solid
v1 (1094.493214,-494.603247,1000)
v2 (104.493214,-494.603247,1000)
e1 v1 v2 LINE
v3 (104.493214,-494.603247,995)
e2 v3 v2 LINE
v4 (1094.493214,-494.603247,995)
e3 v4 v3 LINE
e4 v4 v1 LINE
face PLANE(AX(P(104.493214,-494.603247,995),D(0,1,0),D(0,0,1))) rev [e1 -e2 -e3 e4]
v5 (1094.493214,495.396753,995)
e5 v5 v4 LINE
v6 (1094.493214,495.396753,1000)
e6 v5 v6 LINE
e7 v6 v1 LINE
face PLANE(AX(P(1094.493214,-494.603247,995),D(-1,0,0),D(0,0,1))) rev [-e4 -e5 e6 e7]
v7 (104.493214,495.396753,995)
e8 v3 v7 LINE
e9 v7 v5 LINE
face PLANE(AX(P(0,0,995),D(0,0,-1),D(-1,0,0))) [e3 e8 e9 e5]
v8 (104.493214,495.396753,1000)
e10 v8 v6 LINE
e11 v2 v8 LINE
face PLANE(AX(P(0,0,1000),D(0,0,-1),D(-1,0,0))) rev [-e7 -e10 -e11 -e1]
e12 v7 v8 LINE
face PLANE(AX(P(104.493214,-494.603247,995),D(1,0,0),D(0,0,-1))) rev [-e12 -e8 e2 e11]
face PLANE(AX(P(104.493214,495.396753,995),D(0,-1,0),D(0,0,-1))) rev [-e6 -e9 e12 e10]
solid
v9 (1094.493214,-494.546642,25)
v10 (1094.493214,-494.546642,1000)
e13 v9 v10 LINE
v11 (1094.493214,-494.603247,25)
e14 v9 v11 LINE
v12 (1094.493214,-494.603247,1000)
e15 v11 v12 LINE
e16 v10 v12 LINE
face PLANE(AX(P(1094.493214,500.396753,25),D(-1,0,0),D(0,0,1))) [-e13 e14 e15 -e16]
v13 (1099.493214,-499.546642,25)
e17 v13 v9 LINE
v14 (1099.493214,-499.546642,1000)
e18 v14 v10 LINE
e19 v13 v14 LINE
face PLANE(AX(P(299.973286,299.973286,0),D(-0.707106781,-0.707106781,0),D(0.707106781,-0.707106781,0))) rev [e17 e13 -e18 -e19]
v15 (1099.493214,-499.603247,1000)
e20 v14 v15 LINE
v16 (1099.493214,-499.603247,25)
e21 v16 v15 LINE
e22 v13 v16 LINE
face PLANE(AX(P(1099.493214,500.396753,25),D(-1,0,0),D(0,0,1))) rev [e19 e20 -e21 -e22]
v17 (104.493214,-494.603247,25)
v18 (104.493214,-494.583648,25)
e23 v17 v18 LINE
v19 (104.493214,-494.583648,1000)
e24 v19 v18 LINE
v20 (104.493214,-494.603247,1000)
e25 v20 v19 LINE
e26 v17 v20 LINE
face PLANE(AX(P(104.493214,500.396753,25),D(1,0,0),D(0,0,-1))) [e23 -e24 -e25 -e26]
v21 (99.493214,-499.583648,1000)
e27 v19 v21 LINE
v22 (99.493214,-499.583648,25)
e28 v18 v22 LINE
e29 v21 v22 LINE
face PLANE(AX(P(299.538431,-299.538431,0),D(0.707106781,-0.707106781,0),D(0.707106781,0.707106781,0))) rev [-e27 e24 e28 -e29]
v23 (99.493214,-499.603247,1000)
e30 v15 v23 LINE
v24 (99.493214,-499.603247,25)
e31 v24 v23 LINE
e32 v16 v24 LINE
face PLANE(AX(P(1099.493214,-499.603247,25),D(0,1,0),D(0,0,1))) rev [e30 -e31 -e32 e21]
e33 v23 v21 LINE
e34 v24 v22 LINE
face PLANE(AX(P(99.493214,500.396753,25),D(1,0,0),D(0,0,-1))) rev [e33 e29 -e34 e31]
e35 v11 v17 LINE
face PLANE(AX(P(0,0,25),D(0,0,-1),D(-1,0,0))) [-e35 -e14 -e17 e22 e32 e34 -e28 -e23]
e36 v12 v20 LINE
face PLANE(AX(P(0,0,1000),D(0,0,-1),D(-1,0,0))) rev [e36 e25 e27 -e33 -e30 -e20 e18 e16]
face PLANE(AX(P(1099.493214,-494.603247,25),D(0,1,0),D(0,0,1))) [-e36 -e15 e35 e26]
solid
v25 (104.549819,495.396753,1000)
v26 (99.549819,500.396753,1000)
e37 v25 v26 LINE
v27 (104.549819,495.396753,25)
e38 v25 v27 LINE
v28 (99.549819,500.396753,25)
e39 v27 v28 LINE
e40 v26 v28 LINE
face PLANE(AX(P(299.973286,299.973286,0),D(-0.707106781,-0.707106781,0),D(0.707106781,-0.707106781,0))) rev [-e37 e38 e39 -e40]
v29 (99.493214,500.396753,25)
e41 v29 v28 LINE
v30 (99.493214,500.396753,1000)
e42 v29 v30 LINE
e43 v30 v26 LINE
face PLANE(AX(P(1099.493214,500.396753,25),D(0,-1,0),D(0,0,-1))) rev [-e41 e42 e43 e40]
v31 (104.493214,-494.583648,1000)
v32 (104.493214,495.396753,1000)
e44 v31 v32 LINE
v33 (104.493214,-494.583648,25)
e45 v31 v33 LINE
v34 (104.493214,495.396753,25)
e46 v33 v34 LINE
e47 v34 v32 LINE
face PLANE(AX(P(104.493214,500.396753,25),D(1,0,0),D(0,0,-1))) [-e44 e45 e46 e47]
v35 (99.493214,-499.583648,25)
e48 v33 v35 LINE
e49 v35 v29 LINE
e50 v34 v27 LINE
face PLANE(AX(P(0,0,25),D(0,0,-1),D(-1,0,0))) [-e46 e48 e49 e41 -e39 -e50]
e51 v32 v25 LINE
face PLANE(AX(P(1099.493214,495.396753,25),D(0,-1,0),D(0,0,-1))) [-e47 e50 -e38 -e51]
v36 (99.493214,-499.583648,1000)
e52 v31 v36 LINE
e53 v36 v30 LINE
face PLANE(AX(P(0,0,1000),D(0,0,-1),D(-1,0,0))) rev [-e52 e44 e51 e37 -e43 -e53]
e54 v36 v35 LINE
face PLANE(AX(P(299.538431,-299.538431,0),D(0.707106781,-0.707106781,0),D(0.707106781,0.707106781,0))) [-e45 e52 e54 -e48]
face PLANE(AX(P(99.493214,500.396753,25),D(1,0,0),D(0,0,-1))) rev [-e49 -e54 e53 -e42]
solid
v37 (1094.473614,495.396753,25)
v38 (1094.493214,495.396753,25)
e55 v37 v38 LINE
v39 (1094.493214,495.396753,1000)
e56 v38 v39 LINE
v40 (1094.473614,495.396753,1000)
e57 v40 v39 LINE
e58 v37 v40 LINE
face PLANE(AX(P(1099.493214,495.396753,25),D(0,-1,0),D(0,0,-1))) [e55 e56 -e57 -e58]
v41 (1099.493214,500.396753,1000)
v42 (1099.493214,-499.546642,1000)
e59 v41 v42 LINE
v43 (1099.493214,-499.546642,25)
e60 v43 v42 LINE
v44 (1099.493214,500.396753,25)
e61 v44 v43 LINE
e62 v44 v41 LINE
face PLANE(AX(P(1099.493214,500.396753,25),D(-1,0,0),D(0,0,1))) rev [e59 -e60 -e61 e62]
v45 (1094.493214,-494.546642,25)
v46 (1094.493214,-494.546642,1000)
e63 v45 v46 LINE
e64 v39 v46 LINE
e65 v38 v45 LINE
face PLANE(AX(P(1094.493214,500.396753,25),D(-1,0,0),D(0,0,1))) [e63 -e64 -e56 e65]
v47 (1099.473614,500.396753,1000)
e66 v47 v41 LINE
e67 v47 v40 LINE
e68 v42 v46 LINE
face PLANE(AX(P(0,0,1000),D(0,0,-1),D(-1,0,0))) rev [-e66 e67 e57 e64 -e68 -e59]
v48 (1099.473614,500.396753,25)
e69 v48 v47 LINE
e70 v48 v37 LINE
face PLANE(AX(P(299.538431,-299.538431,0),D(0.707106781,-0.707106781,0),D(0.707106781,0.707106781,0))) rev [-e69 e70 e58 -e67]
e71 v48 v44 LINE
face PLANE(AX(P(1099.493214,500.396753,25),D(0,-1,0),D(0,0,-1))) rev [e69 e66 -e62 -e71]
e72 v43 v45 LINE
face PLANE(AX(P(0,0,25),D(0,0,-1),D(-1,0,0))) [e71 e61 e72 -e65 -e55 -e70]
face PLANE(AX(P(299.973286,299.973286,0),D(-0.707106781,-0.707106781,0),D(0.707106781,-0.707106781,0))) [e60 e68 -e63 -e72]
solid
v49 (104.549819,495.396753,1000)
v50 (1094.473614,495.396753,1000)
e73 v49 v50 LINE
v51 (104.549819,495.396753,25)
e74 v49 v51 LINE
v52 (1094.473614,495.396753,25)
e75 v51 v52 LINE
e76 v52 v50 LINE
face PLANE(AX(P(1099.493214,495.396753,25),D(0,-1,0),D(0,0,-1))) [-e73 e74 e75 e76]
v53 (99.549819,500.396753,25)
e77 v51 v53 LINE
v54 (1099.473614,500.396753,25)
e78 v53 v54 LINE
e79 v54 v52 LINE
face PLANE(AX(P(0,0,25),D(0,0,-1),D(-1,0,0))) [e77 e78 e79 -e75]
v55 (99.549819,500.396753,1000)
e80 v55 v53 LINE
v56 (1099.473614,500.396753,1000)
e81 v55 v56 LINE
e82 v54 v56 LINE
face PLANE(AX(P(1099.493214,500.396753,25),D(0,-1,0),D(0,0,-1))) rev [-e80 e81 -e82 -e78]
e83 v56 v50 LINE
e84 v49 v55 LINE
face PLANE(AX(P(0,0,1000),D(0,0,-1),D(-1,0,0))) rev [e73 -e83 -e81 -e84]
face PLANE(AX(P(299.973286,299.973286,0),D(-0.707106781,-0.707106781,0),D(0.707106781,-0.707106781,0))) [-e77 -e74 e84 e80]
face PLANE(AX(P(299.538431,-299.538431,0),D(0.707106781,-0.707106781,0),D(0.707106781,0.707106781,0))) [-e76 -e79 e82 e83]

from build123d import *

# Parameters (mm, degrees)
SKETCH3_W           = 1000
SKETCH3_H           = 1000
SKETCH3_W_2         = 990
SKETCH3_H_2         = 990
EXTRUDE_THIN1_DEPTH = 975
SKETCH4_W           = 990
SKETCH4_H           = 990
BOSS_EXTRUDE1_DEPTH = 5
SPLIT2_START        = 25
SPLIT2_DEPTH        = 975
SPLIT2_START_2      = -282.90665875
SPLIT2_2_OUTLINE_W  = 708.611311157
SPLIT2_2_OUTLINE_H  = 978
SPLIT2_2_DEPTH      = 1414.199703204
SPLIT2_START_3      = 424.226289007
SPLIT2_3_OUTLINE_W  = 708.388688843
SPLIT2_3_OUTLINE_H  = 978
SPLIT2_3_DEPTH      = 707.066755447
SPLIT2_4_DEPTH      = 975
SPLIT2_5_DEPTH      = 975


# Read off the part's stored shape, not the designer's step: Split2
with BuildPart() as part:
    # Sketch3 → Extrude-Thin1 (new body)
    with BuildSketch(Plane(origin=(0, 0, 1000), x_dir=(-1, 0, 0), z_dir=(0, 0, -1))):
        with Locations((-599.493213862, 0.396752623)):
            Rectangle(SKETCH3_W, SKETCH3_H)
        with Locations((-599.493213862, 0.396752623)):
            Rectangle(SKETCH3_W_2, SKETCH3_H_2, mode=Mode.SUBTRACT)
    extrude(amount=EXTRUDE_THIN1_DEPTH)

    # Split2 2 outline → Split2 2 (cut)
    with BuildSketch(Plane(origin=(0, 0, 0), x_dir=(0.7071067811865471, -0.707106781186548, 0), z_dir=(0.707106781186548, 0.707106781186547, 0)).offset(SPLIT2_START_2)):
        with Locations((69.305655579, -513)):
            Rectangle(SPLIT2_2_OUTLINE_W, SPLIT2_2_OUTLINE_H)
    extrude(amount=SPLIT2_2_DEPTH, mode=Mode.SUBTRACT)

    # Split2 3 outline → Split2 3 (cut)
    with BuildSketch(Plane(origin=(0, 0, 0), x_dir=(0.7071067811865471, -0.707106781186548, 0), z_dir=(0.707106781186548, 0.707106781186547, 0)).offset(SPLIT2_START_3)):
        with Locations((777.805655579, -513)):
            Rectangle(SPLIT2_3_OUTLINE_W, SPLIT2_3_OUTLINE_H)
    extrude(amount=SPLIT2_3_DEPTH, mode=Mode.SUBTRACT)


with BuildPart() as body_2:
    # Sketch4 → Boss-Extrude1 (new body)
    with BuildSketch(Plane(origin=(0, 0, 1000), x_dir=(-1, 0, 0), z_dir=(0, 0, -1))):
        with Locations((-599.493213862, 0.396752623)):
            Rectangle(SKETCH4_W, SKETCH4_H)
    extrude(amount=BOSS_EXTRUDE1_DEPTH)


with BuildPart() as body_3:
    # Split2 outline → Split2 (new body)
    with BuildSketch(Plane.XY.offset(SPLIT2_START)):
        Polygon((104.549818806, 495.396752623), (1094.473614036, 495.396752623), (1099.473614036, 500.396752623), (99.549818806, 500.396752623), align=None)
    extrude(amount=SPLIT2_DEPTH)


with BuildPart() as body_4:
    # Split2 4 outline → Split2 4 (new body)
    with BuildSketch(Plane.XY.offset(SPLIT2_START)):
        Polygon((1099.473614036, 500.396752623), (1094.473614036, 495.396752623), (1094.493213862, 495.396752623), (1094.493213862, -494.546642432), (1099.493213862, -499.546642432), (1099.493213862, 500.396752623), align=None)
    extrude(amount=SPLIT2_4_DEPTH)


with BuildPart() as body_5:
    # Split2 5 outline → Split2 5 (new body)
    with BuildSketch(Plane.XY.offset(SPLIT2_START)):
        Polygon((104.549818806, 495.396752623), (99.549818806, 500.396752623), (99.493213862, 500.396752623), (99.493213862, -499.583647551), (104.493213862, -494.583647551), (104.493213862, 495.396752623), align=None)
    extrude(amount=SPLIT2_5_DEPTH)


solid = Compound([part.part, body_2.part, body_3.part, body_4.part, body_5.part])
